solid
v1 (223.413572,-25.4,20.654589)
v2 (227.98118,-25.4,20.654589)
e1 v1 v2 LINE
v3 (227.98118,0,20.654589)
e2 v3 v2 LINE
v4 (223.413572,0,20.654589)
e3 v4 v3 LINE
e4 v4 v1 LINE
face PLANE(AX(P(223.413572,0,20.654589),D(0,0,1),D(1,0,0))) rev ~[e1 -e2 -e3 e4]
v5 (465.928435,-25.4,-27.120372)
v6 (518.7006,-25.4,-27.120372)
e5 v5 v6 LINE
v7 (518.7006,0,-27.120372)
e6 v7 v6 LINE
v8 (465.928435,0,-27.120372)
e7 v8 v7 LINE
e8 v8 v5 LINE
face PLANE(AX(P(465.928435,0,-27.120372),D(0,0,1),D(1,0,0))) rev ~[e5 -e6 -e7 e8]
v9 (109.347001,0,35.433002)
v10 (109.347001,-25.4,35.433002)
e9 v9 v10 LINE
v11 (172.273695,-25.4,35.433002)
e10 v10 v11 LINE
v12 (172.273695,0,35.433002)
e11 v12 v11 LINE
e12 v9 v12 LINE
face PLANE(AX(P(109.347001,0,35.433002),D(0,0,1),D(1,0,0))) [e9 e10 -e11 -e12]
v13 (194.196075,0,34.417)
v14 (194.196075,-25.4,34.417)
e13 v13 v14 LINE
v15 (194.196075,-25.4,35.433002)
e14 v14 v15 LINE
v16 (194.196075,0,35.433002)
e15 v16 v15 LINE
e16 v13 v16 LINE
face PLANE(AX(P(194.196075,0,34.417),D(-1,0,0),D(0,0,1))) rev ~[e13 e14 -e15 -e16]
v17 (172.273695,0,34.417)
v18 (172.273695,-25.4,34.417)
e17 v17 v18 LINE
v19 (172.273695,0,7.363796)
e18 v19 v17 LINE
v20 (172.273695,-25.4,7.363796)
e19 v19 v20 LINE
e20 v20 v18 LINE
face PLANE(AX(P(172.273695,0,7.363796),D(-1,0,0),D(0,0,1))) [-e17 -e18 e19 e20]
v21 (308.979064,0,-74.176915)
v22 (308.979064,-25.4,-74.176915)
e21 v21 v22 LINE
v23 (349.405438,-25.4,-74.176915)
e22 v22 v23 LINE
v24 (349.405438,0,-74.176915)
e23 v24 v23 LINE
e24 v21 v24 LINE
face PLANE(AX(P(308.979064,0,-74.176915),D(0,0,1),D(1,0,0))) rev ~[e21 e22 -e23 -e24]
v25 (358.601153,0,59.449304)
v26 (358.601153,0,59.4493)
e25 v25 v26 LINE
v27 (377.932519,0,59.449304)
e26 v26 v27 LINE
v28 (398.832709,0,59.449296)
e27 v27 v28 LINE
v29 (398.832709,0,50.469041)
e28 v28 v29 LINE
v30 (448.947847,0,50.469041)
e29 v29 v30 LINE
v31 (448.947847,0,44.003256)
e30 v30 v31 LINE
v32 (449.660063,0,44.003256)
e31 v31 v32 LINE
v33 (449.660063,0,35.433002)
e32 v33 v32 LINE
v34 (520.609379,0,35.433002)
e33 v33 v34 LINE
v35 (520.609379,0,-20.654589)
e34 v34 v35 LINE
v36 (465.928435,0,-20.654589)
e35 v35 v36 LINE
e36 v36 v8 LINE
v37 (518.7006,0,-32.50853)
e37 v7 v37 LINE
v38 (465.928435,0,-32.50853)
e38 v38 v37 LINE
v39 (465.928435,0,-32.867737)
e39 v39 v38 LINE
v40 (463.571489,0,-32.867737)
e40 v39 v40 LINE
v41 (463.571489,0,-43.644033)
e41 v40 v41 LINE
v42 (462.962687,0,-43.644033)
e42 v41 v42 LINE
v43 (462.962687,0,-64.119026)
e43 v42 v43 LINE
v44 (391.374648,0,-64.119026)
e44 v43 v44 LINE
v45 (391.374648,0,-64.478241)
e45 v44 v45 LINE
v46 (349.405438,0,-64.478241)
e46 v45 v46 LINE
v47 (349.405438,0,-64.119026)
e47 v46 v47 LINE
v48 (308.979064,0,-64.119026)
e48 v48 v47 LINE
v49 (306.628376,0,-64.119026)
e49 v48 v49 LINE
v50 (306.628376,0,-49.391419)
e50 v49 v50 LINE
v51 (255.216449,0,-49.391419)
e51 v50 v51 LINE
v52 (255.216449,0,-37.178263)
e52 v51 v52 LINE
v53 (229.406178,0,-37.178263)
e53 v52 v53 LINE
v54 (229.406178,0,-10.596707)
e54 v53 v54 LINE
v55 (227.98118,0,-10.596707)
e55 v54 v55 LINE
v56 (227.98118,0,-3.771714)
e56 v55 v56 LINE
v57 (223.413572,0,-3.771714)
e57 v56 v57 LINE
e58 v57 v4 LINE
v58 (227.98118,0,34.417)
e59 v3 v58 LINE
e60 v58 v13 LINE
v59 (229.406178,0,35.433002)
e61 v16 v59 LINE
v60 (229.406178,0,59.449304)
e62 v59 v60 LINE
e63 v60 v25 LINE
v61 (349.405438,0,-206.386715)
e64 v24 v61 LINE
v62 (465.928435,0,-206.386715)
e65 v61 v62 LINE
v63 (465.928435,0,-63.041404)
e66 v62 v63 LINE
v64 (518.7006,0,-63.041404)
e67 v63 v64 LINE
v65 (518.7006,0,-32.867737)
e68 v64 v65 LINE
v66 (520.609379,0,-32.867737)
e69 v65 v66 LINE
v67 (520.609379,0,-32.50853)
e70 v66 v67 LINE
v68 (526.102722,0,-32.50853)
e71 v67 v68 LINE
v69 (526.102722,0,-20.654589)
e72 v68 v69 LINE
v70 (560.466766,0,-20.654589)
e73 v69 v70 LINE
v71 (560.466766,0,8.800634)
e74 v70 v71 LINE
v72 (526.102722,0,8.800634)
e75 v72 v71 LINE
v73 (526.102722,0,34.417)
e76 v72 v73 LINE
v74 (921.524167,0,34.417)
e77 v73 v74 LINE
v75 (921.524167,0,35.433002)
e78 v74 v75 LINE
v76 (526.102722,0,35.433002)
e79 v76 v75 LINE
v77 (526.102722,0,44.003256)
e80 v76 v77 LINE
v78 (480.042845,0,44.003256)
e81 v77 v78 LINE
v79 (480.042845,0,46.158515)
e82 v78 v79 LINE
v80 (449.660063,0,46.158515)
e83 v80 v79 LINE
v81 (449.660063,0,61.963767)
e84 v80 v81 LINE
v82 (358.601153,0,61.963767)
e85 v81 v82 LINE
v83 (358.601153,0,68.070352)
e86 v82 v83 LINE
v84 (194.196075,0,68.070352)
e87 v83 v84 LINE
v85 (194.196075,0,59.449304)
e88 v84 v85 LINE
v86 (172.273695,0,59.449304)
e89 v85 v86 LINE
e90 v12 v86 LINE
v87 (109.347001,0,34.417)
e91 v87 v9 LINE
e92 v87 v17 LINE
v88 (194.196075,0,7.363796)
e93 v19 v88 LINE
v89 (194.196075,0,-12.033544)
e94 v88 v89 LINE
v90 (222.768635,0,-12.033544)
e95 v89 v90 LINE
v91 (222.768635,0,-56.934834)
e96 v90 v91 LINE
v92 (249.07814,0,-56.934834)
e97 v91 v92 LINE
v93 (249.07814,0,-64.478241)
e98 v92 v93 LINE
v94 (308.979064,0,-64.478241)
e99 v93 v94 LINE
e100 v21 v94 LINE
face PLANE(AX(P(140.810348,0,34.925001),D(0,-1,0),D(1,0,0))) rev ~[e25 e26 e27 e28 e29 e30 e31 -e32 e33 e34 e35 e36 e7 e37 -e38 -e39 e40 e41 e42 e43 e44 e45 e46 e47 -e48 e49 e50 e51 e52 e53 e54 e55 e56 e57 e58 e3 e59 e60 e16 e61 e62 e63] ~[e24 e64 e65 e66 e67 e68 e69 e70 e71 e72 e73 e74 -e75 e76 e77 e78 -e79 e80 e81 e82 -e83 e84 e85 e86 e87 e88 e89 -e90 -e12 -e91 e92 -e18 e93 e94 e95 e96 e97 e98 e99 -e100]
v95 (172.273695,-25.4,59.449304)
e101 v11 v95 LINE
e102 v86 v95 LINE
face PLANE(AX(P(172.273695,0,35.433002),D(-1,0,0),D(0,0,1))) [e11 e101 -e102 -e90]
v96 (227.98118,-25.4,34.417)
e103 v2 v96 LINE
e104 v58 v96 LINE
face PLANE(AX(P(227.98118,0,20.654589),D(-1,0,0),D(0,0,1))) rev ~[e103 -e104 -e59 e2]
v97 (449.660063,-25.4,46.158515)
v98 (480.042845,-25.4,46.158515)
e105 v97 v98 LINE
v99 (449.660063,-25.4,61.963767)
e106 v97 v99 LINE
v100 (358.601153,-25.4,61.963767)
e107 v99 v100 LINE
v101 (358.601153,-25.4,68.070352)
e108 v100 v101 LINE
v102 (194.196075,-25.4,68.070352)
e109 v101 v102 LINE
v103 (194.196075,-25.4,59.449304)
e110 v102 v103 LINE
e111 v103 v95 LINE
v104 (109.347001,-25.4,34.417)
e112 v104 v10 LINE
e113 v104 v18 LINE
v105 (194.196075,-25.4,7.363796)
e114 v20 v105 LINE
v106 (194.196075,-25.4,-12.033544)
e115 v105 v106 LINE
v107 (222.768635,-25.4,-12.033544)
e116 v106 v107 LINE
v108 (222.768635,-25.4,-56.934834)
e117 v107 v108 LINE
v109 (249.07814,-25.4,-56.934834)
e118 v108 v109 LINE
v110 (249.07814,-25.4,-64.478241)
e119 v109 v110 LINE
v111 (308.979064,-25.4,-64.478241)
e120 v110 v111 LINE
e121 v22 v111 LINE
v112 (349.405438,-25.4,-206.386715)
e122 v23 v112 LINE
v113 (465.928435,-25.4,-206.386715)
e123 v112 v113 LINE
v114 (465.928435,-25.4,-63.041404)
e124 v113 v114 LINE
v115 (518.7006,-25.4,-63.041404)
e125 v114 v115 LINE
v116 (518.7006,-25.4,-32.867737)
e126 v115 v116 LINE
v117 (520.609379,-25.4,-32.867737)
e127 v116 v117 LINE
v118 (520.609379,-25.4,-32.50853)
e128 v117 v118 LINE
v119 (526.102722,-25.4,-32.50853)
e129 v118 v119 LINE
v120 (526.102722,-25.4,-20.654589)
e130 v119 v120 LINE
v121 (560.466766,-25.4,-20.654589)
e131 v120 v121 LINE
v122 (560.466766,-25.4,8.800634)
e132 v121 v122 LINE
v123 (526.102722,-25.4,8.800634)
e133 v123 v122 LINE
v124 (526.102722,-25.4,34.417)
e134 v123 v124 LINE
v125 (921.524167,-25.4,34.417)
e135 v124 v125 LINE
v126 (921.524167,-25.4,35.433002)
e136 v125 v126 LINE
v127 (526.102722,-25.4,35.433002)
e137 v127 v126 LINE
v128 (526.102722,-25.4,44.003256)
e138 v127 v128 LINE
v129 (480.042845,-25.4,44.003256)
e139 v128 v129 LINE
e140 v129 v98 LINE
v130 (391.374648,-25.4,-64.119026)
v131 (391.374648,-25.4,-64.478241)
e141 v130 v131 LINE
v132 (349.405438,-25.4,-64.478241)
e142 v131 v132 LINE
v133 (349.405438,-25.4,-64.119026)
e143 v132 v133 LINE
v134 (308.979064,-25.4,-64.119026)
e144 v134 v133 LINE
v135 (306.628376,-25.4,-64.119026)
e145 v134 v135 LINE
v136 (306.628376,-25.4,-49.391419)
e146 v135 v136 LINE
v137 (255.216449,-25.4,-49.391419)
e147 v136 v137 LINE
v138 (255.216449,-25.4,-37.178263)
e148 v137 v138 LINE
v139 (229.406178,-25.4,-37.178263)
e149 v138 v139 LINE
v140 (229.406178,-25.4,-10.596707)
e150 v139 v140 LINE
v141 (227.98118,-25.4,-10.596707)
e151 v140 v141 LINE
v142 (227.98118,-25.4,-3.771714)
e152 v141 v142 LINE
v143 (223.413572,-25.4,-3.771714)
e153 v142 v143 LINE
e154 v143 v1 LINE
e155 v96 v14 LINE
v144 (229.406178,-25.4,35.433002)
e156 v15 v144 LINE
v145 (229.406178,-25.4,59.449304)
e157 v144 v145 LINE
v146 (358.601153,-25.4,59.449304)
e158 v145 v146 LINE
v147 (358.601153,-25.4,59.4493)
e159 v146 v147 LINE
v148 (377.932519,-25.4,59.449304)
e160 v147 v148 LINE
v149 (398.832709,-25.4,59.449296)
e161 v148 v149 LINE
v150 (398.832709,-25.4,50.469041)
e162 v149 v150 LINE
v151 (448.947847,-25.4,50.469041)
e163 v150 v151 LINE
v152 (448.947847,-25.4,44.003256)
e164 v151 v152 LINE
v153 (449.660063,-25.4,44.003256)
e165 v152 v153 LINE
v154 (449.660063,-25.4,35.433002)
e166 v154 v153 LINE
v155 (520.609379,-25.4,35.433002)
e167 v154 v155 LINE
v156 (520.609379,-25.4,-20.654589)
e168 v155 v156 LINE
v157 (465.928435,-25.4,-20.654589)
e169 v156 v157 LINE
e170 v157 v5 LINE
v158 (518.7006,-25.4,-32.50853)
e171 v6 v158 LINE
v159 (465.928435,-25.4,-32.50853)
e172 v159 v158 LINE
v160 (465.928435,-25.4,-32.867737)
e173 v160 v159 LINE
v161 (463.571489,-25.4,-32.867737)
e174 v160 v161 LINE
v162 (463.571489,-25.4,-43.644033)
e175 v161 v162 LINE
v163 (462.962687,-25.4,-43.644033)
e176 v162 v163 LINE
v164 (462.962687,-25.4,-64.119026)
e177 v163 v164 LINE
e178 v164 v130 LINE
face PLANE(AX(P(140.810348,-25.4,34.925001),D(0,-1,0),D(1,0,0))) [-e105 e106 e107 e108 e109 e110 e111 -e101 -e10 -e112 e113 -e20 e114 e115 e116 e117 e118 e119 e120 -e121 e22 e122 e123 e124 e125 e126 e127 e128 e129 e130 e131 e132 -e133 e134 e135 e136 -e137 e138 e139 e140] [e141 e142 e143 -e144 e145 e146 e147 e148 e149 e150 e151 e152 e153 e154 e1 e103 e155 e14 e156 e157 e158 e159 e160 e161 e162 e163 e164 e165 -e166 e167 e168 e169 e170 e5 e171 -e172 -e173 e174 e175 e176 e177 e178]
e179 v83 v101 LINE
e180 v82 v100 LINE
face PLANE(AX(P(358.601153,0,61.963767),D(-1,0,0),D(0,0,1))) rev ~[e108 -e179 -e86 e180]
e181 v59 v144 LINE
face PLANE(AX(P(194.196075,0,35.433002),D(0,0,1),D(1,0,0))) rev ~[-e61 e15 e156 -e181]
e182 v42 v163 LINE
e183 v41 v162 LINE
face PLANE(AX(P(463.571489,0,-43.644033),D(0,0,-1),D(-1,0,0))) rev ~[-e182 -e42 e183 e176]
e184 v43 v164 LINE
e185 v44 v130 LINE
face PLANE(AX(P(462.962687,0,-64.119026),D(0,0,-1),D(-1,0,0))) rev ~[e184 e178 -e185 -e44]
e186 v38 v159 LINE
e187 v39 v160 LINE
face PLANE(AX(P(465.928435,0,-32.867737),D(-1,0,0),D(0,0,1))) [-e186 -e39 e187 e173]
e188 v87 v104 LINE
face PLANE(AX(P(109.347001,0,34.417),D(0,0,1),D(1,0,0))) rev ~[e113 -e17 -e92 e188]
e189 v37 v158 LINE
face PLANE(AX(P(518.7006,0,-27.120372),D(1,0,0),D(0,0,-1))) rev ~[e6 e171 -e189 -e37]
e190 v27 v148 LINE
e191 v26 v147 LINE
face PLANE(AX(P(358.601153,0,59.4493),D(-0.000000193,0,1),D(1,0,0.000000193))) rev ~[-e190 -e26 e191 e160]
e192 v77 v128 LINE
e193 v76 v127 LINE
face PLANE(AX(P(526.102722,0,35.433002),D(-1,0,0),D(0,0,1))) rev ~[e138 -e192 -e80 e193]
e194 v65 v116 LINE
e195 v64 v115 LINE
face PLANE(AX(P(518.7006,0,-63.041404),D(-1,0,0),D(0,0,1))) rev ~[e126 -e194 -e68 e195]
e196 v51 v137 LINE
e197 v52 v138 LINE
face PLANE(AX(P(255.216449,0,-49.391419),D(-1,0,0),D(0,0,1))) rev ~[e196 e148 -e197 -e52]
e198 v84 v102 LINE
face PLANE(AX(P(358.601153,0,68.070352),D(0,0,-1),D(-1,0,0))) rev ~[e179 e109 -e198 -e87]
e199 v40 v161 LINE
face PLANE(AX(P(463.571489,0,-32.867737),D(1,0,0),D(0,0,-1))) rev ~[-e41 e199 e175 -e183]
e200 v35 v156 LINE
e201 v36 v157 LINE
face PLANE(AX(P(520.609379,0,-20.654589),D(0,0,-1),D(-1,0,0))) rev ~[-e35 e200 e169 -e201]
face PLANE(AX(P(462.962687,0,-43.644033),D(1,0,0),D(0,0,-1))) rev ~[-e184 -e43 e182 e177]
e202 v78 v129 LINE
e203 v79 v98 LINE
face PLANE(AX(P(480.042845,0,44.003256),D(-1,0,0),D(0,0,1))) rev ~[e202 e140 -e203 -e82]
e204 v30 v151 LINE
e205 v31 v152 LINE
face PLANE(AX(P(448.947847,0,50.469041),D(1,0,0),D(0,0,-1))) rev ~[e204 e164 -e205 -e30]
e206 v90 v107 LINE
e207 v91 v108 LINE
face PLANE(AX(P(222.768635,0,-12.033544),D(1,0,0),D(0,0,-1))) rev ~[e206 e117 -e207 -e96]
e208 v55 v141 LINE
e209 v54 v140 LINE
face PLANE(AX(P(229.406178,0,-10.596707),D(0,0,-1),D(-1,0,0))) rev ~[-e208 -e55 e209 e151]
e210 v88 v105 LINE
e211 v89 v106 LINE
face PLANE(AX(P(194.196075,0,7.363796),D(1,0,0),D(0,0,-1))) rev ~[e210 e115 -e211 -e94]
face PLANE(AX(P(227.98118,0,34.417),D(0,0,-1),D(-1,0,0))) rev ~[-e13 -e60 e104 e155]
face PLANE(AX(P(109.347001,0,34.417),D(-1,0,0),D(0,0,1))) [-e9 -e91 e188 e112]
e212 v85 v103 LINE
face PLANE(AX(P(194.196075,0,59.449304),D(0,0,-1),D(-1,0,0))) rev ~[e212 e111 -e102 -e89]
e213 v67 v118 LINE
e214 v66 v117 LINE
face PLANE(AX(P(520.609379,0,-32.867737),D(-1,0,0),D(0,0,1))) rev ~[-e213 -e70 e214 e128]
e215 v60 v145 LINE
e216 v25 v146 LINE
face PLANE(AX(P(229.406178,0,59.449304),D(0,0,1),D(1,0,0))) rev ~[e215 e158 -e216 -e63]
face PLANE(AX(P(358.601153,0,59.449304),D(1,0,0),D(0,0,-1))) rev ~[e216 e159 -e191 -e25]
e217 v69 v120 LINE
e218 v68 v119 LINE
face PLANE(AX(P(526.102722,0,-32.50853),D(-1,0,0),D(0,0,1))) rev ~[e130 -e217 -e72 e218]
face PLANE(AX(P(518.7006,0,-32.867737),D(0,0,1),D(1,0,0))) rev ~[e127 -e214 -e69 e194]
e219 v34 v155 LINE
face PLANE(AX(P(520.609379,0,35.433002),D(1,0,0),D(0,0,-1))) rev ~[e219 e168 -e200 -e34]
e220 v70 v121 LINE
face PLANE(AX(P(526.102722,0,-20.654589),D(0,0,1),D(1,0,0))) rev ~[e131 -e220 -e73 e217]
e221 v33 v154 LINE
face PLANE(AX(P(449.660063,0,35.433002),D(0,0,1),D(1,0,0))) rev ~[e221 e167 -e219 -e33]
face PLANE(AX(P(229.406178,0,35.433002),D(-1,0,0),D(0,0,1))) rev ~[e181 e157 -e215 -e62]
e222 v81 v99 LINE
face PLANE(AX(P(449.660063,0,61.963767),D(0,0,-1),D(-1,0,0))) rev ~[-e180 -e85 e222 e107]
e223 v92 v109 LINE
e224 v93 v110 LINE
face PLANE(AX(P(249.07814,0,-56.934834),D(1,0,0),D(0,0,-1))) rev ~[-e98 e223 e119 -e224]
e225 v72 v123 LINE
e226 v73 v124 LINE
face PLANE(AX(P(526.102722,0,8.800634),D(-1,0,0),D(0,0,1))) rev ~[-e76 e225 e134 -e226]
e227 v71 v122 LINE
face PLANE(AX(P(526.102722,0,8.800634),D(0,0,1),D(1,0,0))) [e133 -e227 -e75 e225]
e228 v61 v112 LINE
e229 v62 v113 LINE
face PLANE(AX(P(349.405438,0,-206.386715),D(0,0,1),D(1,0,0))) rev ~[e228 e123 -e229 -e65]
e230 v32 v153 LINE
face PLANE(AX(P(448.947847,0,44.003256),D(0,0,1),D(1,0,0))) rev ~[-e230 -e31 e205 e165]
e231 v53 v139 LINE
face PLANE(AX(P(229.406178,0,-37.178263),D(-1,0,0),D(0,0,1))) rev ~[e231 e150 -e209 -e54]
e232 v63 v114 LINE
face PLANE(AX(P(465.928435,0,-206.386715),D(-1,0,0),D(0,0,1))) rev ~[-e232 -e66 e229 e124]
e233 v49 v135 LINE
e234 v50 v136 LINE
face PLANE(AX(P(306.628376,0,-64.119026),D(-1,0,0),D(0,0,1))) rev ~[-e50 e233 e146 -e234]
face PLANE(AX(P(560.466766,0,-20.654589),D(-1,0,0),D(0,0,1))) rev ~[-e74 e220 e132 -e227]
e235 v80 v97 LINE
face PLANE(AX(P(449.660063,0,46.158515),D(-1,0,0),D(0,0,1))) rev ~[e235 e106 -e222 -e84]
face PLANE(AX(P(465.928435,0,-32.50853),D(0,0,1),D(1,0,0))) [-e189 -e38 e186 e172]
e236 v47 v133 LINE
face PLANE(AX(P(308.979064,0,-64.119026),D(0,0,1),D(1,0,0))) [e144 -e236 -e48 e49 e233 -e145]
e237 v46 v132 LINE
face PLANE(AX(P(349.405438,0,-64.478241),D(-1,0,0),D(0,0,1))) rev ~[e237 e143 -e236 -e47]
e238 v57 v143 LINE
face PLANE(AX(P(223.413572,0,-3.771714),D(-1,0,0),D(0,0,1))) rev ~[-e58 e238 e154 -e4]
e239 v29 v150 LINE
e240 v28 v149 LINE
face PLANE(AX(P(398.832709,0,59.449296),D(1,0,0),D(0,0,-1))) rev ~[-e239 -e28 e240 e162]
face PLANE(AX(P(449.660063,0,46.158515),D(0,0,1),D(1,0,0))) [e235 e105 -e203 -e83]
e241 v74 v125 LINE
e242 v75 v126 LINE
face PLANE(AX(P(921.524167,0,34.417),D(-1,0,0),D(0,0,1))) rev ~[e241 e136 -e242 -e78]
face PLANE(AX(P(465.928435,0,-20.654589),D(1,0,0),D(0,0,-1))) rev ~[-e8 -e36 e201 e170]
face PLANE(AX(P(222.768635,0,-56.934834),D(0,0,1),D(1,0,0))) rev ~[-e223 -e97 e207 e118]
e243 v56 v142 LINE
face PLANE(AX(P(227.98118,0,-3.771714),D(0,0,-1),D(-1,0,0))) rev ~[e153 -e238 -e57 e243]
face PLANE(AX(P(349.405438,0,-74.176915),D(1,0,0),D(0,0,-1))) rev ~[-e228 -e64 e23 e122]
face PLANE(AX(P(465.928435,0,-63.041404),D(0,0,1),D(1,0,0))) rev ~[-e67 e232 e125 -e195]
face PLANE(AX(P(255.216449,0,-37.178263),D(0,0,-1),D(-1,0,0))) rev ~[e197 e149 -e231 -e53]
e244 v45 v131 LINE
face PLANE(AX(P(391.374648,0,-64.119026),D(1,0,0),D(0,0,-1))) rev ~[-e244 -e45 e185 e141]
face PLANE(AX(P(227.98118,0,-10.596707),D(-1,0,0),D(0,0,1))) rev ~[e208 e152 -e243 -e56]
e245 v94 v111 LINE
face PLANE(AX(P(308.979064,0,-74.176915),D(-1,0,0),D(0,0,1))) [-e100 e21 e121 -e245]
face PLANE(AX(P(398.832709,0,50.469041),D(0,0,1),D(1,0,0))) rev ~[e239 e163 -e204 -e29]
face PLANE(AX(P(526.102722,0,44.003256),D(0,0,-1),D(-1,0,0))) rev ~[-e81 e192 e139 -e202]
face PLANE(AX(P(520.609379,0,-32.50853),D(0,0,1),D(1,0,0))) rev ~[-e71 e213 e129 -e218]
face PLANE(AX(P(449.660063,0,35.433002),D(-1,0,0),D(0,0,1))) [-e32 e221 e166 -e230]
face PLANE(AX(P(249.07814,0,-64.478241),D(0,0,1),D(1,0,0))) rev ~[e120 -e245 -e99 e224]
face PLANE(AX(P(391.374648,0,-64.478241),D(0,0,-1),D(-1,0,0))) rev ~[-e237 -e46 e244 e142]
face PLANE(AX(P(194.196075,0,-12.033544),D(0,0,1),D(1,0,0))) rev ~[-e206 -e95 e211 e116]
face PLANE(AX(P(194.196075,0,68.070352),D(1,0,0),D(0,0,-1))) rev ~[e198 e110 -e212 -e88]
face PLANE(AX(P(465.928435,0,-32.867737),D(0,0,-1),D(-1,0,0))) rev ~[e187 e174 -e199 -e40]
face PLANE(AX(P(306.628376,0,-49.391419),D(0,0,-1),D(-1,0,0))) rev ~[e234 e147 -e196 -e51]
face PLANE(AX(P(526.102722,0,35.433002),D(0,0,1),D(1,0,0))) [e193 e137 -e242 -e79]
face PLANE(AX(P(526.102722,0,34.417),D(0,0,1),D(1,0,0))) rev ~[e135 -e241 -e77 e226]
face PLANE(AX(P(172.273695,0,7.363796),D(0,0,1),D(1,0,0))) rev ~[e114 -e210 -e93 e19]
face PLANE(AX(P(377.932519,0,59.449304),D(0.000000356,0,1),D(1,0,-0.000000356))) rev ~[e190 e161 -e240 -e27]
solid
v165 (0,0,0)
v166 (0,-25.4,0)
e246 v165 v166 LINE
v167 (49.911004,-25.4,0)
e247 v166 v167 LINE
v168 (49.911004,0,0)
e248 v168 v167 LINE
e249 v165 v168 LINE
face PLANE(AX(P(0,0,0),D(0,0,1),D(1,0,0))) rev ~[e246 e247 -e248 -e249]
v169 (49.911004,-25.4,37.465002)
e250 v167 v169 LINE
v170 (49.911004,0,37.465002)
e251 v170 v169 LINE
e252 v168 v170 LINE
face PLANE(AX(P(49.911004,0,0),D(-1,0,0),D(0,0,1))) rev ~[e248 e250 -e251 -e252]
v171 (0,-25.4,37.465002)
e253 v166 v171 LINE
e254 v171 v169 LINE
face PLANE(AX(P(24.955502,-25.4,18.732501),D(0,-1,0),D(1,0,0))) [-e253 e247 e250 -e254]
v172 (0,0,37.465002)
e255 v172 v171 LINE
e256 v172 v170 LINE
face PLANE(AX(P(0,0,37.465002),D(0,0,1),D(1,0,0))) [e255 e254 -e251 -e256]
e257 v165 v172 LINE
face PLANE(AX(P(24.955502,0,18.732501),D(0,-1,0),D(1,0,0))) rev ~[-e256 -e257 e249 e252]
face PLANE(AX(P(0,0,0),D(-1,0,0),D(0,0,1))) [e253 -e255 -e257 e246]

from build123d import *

# Parameters (mm, degrees)
F0_W     = 49.9110035598
F0_H     = 37.4650023878
F1_DEPTH = 25.4
F0_W_2   = 62.9266947508
F0_H_2   = 1.0160021484
F0_W_3   = 21.9223797321
F0_H_3   = 24.016302079
F0_W_4   = 35.2101027966
F0_H_4   = 27.0532034338
F0_W_5   = 0.7122159004
F0_H_5   = 2.1552592516
F0_W_6   = 30.3827822208
F0_H_6   = 8.570253849
F0_W_7   = 40.5665338039
F0_W_8   = 40.4263734818
F0_H_7   = 0.3592148423
F0_H_8   = 9.6986740828
F0_W_9   = 5.4933428764
F0_W_10  = 395.4214453697
F0_H_9   = 25.6163654849
F0_H_10  = 29.4552231207
F0_W_11  = 34.3640446663
F0_H_11  = 11.8539407849
F0_W_12  = 52.7721643448
F0_H_12  = 30.1736667752
F0_W_13  = 1.9087791443
F0_H_13  = 0.3592073917


# Not quite as in the source:
# - ends of sketch curves that miss each other by under 0.0002 mm in the source are joined


with BuildPart() as f1:
    # F0 (on Front) → F1 (new body)
    with BuildSketch(Plane.XZ):
        with Locations((24.9555017799, 18.7325011939)):
            Rectangle(F0_W, F0_H)
    extrude(amount=F1_DEPTH)


with BuildPart() as f1b:
    # F0 (on Front) → F1, piece 2 (new body)
    with BuildSketch(Plane.XZ):
        with Locations((140.8103480935, 34.9250007421)):
            Rectangle(F0_W_2, F0_H_2)
        with Locations((183.234885335, 47.4411528558)):
            Rectangle(F0_W_3, F0_H_3)
        with Locations((183.234885335, 34.9250007421)):
            Rectangle(F0_W_3, F0_H_2)
        with Locations((211.8011265993, 47.4411528558)):
            Rectangle(F0_W_4, F0_H_3)
        with Locations((183.234885335, 20.890397951)):
            Rectangle(F0_W_3, F0_H_4)
        Polygon((227.9811799526, 34.4169996679), (194.196075201, 34.4169996679), (194.196075201, 7.3637962341), (223.4135717154, 7.3637962341), (223.4135717154, 20.6545889378), (227.9811799526, 20.6545889378), align=None)
        Polygon((194.196075201, 68.0703520775), (194.196075201, 59.4493038952), (229.4061779976, 59.4493038952), (229.4061779976, 61.9637668133), (358.6011528969, 61.9637668133), (358.6011528969, 68.0703520775), align=None)
        Polygon((229.4061779976, 61.9637668133), (229.4061779976, 59.4493038952), (231.9025844336, 59.4493038952), (358.6011528969, 59.4493038952), (358.6011528969, 61.9637668133), align=None)
        Polygon((223.4135717154, 7.3637962341), (194.196075201, 7.3637962341), (194.196075201, -12.0335444808), (222.7686345577, -12.0335444808), (222.7686345577, -4.849344492), (227.9811799526, -4.849344492), (227.9811799526, -3.7717141677), (223.4135717154, -3.7717141677), align=None)
        Polygon((358.6011528969, 61.9637668133), (358.6011528969, 59.4493001699), (377.9325187206, 59.4493038952), (398.8327085972, 59.4492964447), (398.8327085972, 50.4690408707), (448.9478468895, 50.4690408707), (448.9478468895, 46.1585149169), (449.6600627899, 46.1585149169), (449.6600627899, 61.9637668133), align=None)
        Polygon((229.4061779976, -12.0335444808), (222.7686345577, -12.0335444808), (222.7686345577, -56.9348335266), (249.0781396627, -56.9348335266), (249.0781396627, -37.1782630682), (229.4061779976, -37.1782630682), align=None)
        Polygon((222.7686345577, -4.849344492), (222.7686345577, -12.0335444808), (229.4061779976, -12.0335444808), (229.4061779976, -10.5967074633), (227.9811799526, -10.5967074633), (227.9811799526, -4.849344492), align=None)
        with Locations((449.3039548397, 45.0808852911)):
            Rectangle(F0_W_5, F0_H_5)
        with Locations((464.8514539003, 45.0808852911)):
            Rectangle(F0_W_6, F0_H_5)
        Polygon((249.0781396627, -37.1782630682), (249.0781396627, -56.9348335266), (306.6283762455, -56.9348335266), (306.6283762455, -49.3914186954), (255.2164494991, -49.3914186954), (255.2164494991, -37.1782630682), align=None)
        Polygon((306.6283762455, -56.9348335266), (249.0781396627, -56.9348335266), (249.0781396627, -64.4782409072), (308.9790642262, -64.4782409072), (308.9790642262, -64.1190260649), (306.6283762455, -64.1190260649), align=None)
        with Locations((464.8514539003, 39.7181287408)):
            Rectangle(F0_W_6, F0_H_6)
        with Locations((500.3261119127, 39.7181287408)):
            Rectangle(F0_W_7, F0_H_6)
        with Locations((329.192250967, -64.298633486)):
            Rectangle(F0_W_8, F0_H_7)
        with Locations((329.192250967, -69.3275779486)):
            Rectangle(F0_W_8, F0_H_8)
        with Locations((523.3560502529, 39.7181287408)):
            Rectangle(F0_W_9, F0_H_6)
        Polygon((391.3746476173, -64.4782409072), (349.4054377079, -64.4782409072), (349.4054377079, -74.1769149899), (443.1339204311, -74.1769149899), (443.1339204311, -64.1190260649), (391.3746476173, -64.1190260649), align=None)
        with Locations((523.3560502529, 34.9250007421)):
            Rectangle(F0_W_9, F0_H_2)
        Polygon((443.1339204311, -74.1769149899), (349.4054377079, -74.1769149899), (349.4054377079, -206.3867151737), (465.9284353256, -206.3867151737), (465.9284353256, -63.0414038897), (462.9626870155, -63.0414038897), (462.9626870155, -64.1190260649), (443.1339204311, -64.1190260649), align=None)
        with Locations((723.813444376, 34.9250007421)):
            Rectangle(F0_W_10, F0_H_2)
        with Locations((523.3560502529, 21.6088169254)):
            Rectangle(F0_W_9, F0_H_9)
        with Locations((523.3560502529, -5.9269773774)):
            Rectangle(F0_W_9, F0_H_10)
        with Locations((543.2847440243, -5.9269773774)):
            Rectangle(F0_W_11, F0_H_10)
        with Locations((523.3560502529, -26.5815593302)):
            Rectangle(F0_W_9, F0_H_11)
        Polygon((520.6093788147, -32.5085297227), (520.6093788147, -20.6545889378), (465.9284353256, -20.6545889378), (465.9284353256, -27.1203722805), (518.7005996704, -27.1203722805), (518.7005996704, -32.5085297227), align=None)
        with Locations((492.314517498, -47.954570502)):
            Rectangle(F0_W_12, F0_H_12)
        Polygon((462.9626870155, -63.0414038897), (465.9284353256, -63.0414038897), (465.9284353256, -32.8677371144), (463.5714888573, -32.8677371144), (463.5714888573, -43.6440333724), (462.9626870155, -43.6440333724), align=None)
        with Locations((519.6549892426, -32.6881334186)):
            Rectangle(F0_W_13, F0_H_13)
        with Locations((492.314517498, -32.6881334186)):
            Rectangle(F0_W_12, F0_H_13)
    extrude(amount=F1_DEPTH)


solid = Compound([f1.part, f1b.part])
